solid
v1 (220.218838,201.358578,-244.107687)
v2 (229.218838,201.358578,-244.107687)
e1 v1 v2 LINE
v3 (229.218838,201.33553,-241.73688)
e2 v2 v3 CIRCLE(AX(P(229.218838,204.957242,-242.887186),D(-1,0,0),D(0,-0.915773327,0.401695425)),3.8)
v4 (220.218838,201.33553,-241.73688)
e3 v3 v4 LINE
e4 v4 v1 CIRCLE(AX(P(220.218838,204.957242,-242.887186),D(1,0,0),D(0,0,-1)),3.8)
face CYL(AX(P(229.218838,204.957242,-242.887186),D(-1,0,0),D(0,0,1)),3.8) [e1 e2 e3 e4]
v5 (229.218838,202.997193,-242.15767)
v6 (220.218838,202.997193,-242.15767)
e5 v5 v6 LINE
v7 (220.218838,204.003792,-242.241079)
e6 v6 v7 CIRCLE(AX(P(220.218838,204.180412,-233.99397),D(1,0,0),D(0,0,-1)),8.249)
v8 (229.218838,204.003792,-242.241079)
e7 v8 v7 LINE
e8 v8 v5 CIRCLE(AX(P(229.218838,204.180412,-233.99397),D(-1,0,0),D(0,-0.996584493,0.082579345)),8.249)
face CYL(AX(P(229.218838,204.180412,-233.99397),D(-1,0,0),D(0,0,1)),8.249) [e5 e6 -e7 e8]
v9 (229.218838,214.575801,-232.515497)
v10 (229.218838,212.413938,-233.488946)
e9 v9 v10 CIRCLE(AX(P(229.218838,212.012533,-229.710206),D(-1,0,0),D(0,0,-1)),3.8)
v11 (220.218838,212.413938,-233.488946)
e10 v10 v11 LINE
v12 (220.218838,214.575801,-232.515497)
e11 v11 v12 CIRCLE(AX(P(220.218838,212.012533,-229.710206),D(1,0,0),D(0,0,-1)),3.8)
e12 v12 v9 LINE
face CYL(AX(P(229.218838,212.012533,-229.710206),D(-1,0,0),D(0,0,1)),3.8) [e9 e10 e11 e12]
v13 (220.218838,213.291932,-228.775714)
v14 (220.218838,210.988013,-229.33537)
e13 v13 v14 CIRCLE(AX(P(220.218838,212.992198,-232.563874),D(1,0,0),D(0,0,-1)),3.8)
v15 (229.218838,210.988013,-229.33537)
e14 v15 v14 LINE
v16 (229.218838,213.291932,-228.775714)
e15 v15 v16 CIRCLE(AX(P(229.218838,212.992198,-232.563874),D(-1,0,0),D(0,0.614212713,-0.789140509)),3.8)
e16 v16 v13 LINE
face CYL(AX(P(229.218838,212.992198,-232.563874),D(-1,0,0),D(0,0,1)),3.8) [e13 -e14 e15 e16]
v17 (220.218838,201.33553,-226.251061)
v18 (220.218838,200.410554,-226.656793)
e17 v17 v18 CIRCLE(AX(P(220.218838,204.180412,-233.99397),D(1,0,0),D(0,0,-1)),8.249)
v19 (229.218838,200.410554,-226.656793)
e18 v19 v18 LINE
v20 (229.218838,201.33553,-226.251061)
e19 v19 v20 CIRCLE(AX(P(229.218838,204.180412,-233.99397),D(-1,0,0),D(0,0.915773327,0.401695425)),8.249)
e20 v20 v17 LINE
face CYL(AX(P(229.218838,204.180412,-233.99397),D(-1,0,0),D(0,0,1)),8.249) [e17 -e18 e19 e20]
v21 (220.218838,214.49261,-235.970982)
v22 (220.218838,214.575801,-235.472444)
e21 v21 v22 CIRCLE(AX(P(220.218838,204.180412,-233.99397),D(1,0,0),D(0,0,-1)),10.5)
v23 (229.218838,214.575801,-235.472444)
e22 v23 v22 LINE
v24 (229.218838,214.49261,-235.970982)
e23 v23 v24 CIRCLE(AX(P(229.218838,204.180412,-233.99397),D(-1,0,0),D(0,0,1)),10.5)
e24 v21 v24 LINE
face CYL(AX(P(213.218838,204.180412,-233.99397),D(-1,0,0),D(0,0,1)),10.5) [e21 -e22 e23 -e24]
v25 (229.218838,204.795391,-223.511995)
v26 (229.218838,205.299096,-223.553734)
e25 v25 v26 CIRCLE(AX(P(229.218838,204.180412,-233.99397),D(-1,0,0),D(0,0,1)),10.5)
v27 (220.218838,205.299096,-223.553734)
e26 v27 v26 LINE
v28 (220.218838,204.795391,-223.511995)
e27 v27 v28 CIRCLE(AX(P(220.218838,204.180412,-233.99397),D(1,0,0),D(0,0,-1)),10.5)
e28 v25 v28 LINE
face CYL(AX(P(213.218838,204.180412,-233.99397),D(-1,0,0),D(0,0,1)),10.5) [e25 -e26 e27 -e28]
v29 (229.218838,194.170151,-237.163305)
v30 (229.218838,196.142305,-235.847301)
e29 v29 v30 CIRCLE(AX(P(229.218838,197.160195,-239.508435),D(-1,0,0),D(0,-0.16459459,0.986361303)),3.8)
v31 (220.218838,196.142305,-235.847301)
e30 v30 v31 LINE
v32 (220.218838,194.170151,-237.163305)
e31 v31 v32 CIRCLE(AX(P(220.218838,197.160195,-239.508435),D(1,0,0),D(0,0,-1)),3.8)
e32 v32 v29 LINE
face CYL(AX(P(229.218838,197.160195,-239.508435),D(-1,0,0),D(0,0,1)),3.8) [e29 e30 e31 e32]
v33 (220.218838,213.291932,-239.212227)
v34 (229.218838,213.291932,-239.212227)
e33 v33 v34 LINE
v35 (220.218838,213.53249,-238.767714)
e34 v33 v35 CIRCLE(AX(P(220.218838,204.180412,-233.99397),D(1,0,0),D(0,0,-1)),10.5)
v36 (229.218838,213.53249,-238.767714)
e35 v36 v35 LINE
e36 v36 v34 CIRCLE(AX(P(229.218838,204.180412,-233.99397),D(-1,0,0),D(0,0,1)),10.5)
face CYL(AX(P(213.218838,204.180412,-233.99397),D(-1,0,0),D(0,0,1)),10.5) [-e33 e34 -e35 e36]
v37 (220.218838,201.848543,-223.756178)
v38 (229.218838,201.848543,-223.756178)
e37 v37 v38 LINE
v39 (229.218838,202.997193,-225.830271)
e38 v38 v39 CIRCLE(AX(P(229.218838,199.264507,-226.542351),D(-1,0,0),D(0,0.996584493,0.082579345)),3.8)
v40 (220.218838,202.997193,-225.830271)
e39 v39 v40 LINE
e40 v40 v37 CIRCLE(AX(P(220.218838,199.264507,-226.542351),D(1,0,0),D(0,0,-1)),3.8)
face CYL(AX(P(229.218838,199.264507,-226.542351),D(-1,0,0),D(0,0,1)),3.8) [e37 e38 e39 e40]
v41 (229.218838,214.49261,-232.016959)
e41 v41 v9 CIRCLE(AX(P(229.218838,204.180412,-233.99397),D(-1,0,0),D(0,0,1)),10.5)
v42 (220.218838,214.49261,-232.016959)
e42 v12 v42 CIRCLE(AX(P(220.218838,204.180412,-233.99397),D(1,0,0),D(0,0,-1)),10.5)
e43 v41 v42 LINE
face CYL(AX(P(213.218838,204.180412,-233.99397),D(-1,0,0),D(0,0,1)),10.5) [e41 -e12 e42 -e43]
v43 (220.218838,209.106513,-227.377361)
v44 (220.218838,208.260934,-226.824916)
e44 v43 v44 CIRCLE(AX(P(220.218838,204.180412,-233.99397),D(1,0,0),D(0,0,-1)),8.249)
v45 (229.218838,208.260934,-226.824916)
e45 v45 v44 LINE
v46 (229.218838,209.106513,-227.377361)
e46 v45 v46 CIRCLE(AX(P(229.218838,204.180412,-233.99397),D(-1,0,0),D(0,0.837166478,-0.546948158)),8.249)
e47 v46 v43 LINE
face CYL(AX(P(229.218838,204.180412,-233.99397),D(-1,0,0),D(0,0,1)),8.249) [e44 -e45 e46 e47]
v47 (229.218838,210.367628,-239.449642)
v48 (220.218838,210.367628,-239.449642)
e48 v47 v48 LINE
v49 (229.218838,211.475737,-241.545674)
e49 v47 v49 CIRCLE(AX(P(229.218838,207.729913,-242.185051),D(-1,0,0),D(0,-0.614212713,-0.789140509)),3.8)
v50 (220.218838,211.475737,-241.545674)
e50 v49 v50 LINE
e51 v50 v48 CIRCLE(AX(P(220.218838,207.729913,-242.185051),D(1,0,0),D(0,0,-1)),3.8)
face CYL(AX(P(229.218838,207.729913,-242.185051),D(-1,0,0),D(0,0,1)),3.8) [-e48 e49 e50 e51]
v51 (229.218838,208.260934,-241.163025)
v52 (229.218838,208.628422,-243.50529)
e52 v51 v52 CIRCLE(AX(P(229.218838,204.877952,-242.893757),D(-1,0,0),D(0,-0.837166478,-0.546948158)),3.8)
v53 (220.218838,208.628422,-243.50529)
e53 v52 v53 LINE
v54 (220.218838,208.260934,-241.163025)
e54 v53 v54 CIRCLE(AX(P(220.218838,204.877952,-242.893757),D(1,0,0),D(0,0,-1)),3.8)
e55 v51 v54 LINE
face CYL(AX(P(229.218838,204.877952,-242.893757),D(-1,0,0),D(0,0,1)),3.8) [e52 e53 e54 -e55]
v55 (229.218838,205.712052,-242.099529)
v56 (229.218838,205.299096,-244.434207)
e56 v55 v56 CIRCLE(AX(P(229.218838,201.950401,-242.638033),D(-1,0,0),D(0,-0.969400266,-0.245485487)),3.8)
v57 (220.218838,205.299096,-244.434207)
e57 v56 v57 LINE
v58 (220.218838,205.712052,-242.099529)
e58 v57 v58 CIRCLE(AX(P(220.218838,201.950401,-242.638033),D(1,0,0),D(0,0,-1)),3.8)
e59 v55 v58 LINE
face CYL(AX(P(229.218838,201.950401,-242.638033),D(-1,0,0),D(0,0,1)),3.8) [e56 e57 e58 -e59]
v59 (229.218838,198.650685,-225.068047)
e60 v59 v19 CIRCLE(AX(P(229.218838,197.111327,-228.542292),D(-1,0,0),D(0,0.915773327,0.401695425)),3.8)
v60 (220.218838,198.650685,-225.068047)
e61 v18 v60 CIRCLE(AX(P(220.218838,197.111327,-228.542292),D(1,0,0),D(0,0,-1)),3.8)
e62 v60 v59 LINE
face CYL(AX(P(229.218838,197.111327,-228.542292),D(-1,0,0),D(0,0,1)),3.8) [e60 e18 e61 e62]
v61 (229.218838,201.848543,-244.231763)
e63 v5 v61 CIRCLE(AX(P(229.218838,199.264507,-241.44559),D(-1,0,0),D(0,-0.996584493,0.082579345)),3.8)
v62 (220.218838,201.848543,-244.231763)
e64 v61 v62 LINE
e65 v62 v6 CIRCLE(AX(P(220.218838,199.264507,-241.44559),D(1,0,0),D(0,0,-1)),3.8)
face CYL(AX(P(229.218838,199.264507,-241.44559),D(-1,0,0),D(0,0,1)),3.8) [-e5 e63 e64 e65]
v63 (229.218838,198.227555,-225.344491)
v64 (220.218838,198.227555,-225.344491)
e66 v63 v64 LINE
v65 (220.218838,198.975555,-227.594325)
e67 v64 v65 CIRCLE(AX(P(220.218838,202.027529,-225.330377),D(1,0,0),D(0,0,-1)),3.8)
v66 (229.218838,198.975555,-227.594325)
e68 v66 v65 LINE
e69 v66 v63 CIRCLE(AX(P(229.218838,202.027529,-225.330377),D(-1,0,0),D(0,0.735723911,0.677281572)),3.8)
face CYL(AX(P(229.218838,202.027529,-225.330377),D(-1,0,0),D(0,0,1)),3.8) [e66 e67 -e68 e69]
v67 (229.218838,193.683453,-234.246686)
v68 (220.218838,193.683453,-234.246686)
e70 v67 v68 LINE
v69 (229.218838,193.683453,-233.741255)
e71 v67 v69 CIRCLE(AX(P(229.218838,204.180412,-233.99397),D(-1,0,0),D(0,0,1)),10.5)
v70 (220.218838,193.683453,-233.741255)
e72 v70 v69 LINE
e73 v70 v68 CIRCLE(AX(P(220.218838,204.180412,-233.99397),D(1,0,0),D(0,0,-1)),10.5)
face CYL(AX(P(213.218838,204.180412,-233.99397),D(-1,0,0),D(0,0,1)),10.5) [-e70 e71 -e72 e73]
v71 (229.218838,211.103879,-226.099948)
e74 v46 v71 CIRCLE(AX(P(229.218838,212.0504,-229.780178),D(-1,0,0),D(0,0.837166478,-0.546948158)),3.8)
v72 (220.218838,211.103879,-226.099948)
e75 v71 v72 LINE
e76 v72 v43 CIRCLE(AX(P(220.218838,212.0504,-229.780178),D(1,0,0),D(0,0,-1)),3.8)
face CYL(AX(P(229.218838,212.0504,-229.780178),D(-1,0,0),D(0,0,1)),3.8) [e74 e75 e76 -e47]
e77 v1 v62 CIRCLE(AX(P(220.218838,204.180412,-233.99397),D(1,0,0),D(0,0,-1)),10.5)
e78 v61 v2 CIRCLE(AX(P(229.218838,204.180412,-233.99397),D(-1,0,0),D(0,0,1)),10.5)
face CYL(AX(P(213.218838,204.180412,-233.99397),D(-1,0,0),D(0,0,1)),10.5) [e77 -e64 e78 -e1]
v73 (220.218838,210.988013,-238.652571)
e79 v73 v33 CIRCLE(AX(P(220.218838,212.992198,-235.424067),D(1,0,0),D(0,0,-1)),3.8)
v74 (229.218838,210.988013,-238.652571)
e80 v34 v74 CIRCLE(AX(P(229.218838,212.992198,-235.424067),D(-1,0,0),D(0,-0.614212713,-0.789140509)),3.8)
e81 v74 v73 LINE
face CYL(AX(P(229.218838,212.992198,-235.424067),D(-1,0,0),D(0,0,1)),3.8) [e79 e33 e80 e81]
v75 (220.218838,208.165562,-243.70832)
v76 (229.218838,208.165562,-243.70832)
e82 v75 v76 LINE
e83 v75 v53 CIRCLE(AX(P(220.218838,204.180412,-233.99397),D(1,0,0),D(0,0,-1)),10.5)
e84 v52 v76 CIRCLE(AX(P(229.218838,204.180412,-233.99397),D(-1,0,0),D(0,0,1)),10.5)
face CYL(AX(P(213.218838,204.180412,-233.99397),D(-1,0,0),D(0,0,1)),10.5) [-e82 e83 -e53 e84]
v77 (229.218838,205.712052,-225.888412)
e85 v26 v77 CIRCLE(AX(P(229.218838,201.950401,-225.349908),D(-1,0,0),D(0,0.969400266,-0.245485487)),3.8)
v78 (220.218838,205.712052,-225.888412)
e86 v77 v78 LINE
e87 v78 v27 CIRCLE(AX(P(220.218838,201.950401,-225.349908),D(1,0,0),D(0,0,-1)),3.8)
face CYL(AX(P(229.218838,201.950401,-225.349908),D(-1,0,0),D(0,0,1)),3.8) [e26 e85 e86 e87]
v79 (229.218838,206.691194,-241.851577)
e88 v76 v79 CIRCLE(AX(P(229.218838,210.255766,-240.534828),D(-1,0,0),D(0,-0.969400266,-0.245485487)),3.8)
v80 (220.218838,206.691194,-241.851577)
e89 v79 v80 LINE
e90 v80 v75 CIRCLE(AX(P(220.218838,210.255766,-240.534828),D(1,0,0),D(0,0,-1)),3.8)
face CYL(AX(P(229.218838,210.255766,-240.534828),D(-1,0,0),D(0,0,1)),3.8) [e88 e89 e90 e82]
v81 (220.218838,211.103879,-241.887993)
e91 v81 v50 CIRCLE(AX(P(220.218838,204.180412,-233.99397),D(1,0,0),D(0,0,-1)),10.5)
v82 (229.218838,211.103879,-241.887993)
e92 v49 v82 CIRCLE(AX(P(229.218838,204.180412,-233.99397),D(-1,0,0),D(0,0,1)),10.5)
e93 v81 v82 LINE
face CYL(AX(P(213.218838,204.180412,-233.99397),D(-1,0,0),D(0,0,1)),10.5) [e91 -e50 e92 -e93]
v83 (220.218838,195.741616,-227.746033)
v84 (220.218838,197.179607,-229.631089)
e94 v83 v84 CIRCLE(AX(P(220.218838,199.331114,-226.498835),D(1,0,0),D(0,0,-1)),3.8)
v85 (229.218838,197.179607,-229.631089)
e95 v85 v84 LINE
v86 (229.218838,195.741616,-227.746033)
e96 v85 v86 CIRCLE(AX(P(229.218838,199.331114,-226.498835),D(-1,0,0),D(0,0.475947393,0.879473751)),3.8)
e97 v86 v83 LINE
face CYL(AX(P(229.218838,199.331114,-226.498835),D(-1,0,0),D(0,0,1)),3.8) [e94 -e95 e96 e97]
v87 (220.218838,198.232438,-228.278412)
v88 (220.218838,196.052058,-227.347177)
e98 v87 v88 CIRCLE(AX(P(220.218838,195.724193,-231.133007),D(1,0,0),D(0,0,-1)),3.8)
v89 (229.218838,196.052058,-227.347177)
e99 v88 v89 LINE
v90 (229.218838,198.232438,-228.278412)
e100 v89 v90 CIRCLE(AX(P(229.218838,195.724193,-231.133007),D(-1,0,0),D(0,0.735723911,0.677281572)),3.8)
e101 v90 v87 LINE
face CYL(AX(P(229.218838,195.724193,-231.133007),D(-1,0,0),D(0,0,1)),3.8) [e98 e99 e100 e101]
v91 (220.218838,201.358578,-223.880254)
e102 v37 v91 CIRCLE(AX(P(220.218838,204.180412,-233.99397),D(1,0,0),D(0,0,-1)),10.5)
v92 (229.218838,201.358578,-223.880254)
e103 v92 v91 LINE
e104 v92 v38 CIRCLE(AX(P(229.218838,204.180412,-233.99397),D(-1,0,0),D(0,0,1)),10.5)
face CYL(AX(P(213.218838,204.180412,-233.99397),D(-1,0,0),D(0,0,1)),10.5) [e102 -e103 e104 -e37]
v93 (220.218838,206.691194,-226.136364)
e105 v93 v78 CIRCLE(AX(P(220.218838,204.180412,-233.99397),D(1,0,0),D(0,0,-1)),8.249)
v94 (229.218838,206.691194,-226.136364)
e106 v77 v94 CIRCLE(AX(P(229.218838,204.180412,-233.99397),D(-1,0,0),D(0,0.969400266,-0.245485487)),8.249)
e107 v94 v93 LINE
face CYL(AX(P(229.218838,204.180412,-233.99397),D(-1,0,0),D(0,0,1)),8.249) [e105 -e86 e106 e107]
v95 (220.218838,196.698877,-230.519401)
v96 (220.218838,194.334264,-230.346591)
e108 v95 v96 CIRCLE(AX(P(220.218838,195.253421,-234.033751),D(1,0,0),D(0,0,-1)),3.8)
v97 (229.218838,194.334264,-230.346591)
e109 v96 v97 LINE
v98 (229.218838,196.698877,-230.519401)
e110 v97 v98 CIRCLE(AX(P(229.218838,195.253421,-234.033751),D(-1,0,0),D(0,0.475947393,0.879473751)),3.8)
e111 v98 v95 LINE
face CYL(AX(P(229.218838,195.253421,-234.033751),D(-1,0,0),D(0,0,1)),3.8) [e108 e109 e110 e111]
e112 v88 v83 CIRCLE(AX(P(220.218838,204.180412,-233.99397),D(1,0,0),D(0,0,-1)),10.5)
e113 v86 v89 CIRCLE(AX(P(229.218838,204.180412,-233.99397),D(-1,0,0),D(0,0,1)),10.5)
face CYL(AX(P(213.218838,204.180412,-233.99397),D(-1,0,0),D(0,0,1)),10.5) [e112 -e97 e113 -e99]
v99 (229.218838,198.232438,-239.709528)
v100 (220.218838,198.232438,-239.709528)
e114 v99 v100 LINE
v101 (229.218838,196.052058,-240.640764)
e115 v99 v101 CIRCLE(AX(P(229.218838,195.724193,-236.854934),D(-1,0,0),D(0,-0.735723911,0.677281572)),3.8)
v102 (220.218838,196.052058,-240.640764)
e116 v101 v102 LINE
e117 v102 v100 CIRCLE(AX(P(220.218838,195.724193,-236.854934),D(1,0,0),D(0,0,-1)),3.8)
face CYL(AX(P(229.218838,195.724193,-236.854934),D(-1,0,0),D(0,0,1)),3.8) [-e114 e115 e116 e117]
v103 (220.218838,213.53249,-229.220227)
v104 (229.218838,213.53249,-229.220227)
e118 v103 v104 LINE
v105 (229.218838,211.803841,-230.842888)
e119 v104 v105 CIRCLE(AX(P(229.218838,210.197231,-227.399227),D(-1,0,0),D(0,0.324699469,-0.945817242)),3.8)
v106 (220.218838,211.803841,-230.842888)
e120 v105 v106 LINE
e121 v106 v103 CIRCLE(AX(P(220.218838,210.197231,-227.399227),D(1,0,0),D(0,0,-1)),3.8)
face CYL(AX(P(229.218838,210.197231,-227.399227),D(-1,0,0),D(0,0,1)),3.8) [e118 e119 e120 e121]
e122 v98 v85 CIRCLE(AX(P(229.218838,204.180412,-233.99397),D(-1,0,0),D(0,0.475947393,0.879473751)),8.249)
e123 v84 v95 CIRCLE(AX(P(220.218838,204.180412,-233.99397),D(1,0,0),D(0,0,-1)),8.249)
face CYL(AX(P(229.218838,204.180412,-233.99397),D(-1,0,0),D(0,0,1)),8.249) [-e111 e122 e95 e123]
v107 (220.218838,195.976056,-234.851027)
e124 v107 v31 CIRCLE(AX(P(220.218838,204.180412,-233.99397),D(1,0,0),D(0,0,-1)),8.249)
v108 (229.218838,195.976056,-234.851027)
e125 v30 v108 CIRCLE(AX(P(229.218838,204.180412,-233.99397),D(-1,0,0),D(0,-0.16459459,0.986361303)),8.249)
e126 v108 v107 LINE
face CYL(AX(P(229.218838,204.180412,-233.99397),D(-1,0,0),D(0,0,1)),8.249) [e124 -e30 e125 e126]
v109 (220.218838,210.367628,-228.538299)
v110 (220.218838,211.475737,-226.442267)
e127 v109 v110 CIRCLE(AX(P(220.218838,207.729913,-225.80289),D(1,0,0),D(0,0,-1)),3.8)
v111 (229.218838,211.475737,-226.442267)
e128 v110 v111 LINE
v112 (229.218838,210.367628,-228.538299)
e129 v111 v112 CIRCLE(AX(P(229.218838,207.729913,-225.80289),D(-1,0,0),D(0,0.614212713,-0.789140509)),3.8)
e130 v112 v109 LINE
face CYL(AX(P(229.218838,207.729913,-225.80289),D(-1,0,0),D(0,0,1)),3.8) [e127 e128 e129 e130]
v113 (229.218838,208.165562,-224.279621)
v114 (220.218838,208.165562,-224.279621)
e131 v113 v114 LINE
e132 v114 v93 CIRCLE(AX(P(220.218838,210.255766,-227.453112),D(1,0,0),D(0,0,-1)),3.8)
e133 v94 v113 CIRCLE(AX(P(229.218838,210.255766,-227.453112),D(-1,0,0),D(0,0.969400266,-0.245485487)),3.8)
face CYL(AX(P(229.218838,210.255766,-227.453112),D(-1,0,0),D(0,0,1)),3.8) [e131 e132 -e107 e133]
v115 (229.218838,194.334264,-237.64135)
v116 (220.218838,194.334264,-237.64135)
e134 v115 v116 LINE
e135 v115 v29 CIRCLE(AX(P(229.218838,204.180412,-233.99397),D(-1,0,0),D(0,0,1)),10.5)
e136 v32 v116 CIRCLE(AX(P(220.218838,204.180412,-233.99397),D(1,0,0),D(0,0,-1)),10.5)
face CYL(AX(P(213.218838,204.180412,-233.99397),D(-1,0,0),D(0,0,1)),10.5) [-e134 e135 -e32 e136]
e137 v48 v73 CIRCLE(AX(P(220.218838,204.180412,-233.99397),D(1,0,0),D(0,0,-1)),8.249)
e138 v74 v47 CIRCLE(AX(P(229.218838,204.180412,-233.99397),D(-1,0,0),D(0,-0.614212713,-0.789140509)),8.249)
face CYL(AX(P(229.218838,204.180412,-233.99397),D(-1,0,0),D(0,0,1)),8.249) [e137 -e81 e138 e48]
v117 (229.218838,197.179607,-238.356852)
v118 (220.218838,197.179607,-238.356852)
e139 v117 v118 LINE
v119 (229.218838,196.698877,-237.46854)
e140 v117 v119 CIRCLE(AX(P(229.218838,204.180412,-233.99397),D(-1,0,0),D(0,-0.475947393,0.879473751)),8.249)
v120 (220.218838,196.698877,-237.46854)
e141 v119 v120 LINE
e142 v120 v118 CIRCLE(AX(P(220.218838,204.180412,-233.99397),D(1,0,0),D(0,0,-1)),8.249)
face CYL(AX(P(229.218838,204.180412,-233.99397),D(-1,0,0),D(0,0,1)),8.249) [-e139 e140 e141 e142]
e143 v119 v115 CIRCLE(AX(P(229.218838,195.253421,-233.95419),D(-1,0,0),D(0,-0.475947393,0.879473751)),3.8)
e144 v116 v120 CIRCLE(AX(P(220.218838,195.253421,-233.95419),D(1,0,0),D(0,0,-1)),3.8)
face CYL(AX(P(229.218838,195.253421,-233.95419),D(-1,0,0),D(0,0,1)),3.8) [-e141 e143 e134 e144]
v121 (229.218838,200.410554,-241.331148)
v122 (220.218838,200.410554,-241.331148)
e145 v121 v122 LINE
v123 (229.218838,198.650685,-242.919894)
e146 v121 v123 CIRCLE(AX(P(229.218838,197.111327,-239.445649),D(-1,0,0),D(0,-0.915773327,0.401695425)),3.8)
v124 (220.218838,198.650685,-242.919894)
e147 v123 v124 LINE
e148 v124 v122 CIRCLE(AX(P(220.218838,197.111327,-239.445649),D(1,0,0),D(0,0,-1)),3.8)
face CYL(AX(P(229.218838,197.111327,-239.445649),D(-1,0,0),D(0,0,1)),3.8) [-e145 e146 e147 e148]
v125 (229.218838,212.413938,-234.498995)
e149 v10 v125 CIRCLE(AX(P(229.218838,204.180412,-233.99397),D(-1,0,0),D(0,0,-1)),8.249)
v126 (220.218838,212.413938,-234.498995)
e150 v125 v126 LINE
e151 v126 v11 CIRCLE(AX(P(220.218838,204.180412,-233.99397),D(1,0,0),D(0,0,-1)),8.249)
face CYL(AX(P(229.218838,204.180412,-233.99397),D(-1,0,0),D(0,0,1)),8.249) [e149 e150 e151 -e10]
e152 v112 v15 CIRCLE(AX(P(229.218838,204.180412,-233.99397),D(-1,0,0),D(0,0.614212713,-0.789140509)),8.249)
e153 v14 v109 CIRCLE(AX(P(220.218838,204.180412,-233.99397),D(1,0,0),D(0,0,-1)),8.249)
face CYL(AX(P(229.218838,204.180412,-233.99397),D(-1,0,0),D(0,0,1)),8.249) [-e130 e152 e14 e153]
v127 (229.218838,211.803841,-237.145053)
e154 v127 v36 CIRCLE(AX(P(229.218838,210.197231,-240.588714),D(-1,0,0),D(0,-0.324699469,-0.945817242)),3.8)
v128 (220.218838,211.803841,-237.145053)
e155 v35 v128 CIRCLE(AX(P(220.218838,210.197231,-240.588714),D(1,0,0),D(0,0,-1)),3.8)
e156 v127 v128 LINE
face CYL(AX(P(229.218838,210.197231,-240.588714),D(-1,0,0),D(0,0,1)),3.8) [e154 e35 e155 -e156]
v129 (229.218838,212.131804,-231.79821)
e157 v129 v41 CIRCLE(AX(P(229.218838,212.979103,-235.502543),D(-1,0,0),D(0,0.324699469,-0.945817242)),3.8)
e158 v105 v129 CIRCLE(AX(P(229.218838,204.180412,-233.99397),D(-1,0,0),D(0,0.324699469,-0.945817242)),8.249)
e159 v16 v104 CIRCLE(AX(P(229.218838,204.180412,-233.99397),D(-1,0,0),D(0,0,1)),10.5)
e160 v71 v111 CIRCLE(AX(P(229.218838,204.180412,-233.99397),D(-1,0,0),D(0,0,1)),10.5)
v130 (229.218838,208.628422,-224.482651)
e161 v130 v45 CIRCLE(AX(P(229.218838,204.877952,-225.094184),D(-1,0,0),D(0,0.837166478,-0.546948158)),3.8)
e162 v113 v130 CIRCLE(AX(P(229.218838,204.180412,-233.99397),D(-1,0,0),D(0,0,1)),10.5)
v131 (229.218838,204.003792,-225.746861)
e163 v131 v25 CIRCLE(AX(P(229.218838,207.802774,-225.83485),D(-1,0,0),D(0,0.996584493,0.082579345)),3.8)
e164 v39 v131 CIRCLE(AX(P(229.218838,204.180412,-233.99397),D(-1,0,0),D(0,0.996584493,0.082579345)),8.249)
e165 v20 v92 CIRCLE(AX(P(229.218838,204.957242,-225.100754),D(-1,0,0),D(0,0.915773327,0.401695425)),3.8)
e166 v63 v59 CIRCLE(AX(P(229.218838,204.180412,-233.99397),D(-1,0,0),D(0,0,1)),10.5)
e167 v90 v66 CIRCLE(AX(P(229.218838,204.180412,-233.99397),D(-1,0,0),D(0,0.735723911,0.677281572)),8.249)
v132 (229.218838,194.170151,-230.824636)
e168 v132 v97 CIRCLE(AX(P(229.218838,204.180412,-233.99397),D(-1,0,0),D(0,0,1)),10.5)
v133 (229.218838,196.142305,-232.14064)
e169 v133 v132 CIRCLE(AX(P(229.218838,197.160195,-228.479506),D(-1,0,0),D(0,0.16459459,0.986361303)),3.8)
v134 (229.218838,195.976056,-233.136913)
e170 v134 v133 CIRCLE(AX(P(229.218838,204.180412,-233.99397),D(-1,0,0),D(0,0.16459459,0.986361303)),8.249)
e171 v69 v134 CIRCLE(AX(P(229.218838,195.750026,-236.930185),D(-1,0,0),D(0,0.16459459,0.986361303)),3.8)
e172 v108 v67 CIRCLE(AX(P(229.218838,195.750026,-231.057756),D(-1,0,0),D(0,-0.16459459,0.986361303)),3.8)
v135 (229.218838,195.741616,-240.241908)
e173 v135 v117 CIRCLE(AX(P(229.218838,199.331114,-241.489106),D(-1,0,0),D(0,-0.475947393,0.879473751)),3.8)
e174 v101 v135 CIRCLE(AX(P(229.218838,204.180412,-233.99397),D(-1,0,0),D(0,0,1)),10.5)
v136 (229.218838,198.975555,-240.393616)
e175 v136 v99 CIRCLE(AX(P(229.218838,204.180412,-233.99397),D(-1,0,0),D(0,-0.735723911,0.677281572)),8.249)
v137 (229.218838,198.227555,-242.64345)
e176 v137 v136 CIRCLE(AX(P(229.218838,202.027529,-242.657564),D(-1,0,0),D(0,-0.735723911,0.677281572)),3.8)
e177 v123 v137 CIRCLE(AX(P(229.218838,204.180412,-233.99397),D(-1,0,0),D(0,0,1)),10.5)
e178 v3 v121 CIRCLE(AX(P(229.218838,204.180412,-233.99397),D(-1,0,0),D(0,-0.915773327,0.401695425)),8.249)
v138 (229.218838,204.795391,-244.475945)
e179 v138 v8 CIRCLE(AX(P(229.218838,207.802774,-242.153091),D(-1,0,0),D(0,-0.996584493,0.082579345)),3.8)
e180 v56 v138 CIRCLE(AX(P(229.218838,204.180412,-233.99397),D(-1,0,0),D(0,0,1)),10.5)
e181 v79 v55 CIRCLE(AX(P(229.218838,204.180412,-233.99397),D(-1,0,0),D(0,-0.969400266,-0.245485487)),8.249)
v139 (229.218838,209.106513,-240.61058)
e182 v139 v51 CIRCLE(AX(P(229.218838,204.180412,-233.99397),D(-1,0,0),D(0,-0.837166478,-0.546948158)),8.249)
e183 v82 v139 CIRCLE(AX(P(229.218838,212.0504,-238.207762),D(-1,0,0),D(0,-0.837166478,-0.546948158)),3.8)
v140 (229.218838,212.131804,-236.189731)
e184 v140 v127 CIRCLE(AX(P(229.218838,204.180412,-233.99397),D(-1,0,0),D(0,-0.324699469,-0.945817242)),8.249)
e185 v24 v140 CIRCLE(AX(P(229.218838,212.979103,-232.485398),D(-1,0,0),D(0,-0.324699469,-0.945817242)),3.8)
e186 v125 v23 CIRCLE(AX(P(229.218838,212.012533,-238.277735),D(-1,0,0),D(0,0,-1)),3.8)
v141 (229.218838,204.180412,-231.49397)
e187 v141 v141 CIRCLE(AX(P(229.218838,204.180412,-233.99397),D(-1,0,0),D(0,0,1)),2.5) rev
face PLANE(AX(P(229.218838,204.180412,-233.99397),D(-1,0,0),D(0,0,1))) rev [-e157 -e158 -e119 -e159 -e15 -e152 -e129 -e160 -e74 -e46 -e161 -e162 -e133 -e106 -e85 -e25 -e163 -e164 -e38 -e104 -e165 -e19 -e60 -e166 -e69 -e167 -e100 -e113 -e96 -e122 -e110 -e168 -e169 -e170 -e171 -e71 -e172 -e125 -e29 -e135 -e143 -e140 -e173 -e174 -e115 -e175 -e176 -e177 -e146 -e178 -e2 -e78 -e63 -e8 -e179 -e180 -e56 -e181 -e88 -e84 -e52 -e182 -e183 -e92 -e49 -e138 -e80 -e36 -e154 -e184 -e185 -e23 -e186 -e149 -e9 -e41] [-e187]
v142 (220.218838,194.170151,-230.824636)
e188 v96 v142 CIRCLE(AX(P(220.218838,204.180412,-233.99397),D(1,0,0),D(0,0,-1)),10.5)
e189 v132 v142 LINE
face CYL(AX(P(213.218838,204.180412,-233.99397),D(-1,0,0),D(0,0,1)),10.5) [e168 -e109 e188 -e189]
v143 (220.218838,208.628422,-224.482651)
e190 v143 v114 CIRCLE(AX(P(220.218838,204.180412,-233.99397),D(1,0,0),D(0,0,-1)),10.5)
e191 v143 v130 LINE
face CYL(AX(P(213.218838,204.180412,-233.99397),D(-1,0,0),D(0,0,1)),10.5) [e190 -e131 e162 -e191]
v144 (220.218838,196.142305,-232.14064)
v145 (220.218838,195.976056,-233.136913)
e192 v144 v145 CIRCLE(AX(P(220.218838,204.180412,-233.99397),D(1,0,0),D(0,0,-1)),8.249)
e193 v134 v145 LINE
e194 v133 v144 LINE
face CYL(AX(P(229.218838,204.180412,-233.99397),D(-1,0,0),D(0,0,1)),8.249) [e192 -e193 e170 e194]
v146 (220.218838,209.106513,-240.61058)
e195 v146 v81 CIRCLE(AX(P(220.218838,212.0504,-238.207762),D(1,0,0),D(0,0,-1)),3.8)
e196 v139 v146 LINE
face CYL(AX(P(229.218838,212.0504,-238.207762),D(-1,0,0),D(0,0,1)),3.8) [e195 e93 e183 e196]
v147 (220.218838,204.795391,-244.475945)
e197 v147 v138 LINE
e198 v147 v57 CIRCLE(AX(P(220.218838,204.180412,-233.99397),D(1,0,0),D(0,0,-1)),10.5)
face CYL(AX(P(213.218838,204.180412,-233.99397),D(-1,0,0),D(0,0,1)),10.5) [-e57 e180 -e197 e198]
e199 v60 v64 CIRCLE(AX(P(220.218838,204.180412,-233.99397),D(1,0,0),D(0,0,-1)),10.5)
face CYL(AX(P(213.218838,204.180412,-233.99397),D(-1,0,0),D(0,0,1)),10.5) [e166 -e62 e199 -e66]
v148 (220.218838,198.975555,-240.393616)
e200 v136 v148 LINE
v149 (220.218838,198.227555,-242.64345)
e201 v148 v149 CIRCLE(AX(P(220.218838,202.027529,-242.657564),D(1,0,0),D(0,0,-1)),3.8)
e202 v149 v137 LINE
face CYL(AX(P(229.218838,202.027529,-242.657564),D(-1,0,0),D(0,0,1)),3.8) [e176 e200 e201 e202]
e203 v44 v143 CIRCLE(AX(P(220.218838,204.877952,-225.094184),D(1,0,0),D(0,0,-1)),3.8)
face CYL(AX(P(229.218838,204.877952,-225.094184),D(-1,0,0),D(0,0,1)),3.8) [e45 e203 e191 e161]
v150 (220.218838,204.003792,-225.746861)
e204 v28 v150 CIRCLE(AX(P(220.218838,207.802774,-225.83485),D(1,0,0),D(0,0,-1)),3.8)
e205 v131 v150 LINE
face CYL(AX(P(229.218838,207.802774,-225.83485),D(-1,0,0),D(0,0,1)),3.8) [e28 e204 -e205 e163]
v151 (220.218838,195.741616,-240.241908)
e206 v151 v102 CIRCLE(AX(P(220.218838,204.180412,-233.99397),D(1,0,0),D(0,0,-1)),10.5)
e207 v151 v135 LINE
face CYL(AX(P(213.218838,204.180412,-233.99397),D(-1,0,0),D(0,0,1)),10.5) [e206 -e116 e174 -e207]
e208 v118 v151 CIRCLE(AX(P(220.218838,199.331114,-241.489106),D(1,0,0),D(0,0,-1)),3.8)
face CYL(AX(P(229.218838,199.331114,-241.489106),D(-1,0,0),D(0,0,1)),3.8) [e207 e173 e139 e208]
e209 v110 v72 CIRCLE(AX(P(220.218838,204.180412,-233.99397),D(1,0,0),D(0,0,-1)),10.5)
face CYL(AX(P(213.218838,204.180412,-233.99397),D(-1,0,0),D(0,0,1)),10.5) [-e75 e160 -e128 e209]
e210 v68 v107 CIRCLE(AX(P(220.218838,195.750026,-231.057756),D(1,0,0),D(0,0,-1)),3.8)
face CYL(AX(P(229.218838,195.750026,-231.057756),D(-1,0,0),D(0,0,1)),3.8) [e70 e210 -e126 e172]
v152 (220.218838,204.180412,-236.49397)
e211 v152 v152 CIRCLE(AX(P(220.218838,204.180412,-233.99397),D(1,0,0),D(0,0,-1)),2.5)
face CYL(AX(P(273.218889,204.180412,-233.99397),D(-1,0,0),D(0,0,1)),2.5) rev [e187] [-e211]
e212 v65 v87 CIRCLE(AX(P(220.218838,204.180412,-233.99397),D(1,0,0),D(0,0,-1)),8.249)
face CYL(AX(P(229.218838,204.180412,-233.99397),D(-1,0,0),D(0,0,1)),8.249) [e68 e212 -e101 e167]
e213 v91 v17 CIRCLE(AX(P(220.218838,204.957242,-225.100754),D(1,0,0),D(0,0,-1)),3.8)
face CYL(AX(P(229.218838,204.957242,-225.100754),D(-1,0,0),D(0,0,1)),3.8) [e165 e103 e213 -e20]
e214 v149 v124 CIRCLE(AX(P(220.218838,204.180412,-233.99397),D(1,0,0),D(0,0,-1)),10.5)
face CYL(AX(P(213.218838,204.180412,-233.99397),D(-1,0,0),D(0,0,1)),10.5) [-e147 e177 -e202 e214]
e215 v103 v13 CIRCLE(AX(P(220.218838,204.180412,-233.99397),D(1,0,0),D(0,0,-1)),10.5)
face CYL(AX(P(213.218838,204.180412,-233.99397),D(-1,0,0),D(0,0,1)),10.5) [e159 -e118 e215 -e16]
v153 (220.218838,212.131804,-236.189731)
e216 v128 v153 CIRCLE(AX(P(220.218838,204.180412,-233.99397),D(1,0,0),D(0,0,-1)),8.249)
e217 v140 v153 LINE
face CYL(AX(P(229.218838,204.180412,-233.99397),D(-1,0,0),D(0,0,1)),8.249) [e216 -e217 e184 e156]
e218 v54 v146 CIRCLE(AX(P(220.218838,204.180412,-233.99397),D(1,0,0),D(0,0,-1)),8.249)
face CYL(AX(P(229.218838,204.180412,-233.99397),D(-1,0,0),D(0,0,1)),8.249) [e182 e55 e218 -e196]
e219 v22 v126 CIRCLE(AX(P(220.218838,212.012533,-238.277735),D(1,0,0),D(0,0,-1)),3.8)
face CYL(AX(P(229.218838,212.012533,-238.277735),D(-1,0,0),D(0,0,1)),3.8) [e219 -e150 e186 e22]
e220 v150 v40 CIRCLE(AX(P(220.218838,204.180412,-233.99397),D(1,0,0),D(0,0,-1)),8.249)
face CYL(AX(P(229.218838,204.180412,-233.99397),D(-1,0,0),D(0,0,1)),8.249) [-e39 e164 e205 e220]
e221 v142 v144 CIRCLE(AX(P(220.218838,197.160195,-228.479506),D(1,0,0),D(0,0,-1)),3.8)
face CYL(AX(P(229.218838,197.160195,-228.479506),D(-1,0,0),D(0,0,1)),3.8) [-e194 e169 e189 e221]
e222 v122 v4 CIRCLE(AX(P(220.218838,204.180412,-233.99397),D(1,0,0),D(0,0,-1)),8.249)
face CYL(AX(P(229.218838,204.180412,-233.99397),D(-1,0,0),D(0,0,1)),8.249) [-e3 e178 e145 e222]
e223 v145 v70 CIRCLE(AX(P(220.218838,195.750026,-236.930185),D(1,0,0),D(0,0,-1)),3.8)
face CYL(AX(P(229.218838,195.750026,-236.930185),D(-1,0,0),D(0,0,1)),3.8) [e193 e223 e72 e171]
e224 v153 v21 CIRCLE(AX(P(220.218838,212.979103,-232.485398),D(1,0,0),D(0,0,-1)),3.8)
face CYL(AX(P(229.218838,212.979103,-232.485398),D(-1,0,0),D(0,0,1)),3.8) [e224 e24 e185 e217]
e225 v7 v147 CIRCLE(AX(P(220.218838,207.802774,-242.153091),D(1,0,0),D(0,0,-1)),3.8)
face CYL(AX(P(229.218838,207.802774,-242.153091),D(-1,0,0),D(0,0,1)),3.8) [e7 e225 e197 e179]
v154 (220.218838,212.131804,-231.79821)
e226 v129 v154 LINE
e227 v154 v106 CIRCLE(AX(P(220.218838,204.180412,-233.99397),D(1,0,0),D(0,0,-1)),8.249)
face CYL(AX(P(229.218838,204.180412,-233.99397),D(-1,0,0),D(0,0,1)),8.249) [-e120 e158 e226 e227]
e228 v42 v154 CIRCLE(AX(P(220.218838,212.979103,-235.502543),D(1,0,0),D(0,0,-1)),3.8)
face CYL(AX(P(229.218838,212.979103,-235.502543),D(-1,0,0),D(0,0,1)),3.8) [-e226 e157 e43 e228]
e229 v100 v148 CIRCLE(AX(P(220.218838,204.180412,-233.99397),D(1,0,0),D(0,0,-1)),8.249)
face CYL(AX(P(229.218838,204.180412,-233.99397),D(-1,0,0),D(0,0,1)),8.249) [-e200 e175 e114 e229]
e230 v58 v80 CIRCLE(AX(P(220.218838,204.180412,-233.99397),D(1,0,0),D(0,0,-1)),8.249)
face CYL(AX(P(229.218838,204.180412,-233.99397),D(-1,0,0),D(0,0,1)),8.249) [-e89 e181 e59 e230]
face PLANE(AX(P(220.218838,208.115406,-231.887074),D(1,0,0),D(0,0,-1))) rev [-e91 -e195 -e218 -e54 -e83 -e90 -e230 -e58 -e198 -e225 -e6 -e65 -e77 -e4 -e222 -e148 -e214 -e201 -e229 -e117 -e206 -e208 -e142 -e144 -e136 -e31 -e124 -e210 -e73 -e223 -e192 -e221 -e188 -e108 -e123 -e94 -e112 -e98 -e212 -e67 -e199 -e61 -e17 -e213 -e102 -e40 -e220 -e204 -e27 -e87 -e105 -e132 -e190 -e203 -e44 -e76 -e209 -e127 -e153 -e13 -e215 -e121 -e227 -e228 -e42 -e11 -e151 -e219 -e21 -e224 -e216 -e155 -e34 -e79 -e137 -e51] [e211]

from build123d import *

# Parameters (mm, degrees)
SPUR_START             = 223.218838191
SPUR_GEAR_AM_OUTLINE_R = 2.5
SPUR_GEAR_AM_DEPTH     = 6
BOSS_EXTRUDE2_START    = -3
SKETCH4_R              = 2.5
BOSS_EXTRUDE2_DEPTH    = 3


# Read off the part's stored shape, not the designer's step: spur gear_am
with BuildPart() as part:
    # spur gear_am outline → spur gear_am (new body)
    with BuildSketch(Plane.YZ.offset(SPUR_START)):
        with BuildLine():
            ThreePointArc((211.475737045, -226.442266721), (211.291868278, -226.268869388), (211.103879422, -226.099947664))
            ThreePointArc((211.103879422, -226.099947664), (210.003020465, -226.578891651), (209.10651348, -227.377360819))
            ThreePointArc((209.10651348, -227.377360819), (208.692187132, -227.088184171), (208.260933872, -226.82491609))
            ThreePointArc((208.260933872, -226.82491609), (208.632027885, -225.683177494), (208.628422007, -224.482650616))
            ThreePointArc((208.628422007, -224.482650616), (208.398213735, -224.37835052), (208.16556184, -224.279621323))
            ThreePointArc((208.16556184, -224.279621323), (207.279863315, -225.090063122), (206.691194067, -226.136364371))
            ThreePointArc((206.691194067, -226.136364371), (206.20542156, -225.997387656), (205.712051785, -225.888411871))
            ThreePointArc((205.712051785, -225.888411871), (205.692316984, -224.688041793), (205.299096042, -223.553733599))
            ThreePointArc((205.299096042, -223.553733599), (205.047494903, -223.529833273), (204.795391412, -223.511995443))
            ThreePointArc((204.795391412, -223.511995443), (204.220832498, -224.566111111), (204.003792434, -225.746861465))
            ThreePointArc((204.003792434, -225.746861465), (203.499214755, -225.773144967), (202.997192736, -225.830270694))
            ThreePointArc((202.997192736, -225.830270694), (202.588767694, -224.701347857), (201.848543279, -223.756178241))
            ThreePointArc((201.848543279, -223.756178241), (201.602814161, -223.815267658), (201.358578398, -223.8802542))
            ThreePointArc((201.358578398, -223.8802542), (201.157421469, -225.063813948), (201.335530247, -226.251060784))
            ThreePointArc((201.335530247, -226.251060784), (200.866826218, -226.439756278), (200.41055383, -226.656793059))
            ThreePointArc((200.41055383, -226.656793059), (199.657697737, -225.721653769), (198.65068465, -225.068046525))
            ThreePointArc((198.65068465, -225.068046525), (198.437456116, -225.203722428), (198.227554816, -225.344491043))
            ThreePointArc((198.227554816, -225.344491043), (198.421598346, -226.529237808), (198.975555117, -227.59432451))
            ThreePointArc((198.975555117, -227.59432451), (198.593516092, -227.924983911), (198.232437527, -228.278412442))
            ThreePointArc((198.232437527, -228.278412442), (197.216734024, -227.638393552), (196.052057758, -227.347177166))
            ThreePointArc((196.052057758, -227.347177166), (195.894436427, -227.544736967), (195.741615653, -227.74603319))
            ThreePointArc((195.741615653, -227.74603319), (196.309832015, -228.803581275), (197.179606967, -229.631089173))
            ThreePointArc((197.179606967, -229.631089173), (196.925632802, -230.067880405), (196.698876527, -230.519401222))
            ThreePointArc((196.698876527, -230.519401222), (195.530392847, -230.243858709), (194.334264148, -230.346590995))
            ThreePointArc((194.334264148, -230.346590995), (194.249330738, -230.584626023), (194.170150992, -230.824636287))
            ThreePointArc((194.170150992, -230.824636287), (195.050965127, -231.640383948), (196.142304648, -232.14063972))
            ThreePointArc((196.142304648, -232.14063972), (196.043917384, -232.636229675), (195.976055959, -233.136913491))
            ThreePointArc((195.976055959, -233.136913491), (194.78141544, -233.255706662), (193.683453412, -233.741254983))
            ThreePointArc((193.683453412, -233.741254983), (193.680411776, -233.99397045), (193.683453412, -234.246685917))
            ThreePointArc((193.683453412, -234.246685917), (194.78141544, -234.732234238), (195.976055959, -234.851027409))
            ThreePointArc((195.976055959, -234.851027409), (196.043917384, -235.351711225), (196.142304648, -235.84730118))
            ThreePointArc((196.142304648, -235.84730118), (195.050965127, -236.347556952), (194.170150992, -237.163304613))
            ThreePointArc((194.170150992, -237.163304613), (194.249330738, -237.403314877), (194.334264148, -237.641349905))
            ThreePointArc((194.334264148, -237.641349905), (195.530392847, -237.744082191), (196.698876527, -237.468539678))
            ThreePointArc((196.698876527, -237.468539678), (196.925632802, -237.920060495), (197.179606967, -238.356851727))
            ThreePointArc((197.179606967, -238.356851727), (196.309832016, -239.184359624), (195.741615653, -240.241907709))
            ThreePointArc((195.741615653, -240.241907709), (195.894436427, -240.443203933), (196.052057758, -240.640763734))
            ThreePointArc((196.052057758, -240.640763734), (197.216734024, -240.349547348), (198.232437527, -239.709528458))
            ThreePointArc((198.232437527, -239.709528458), (198.593516092, -240.062956989), (198.975555117, -240.39361639))
            ThreePointArc((198.975555117, -240.39361639), (198.421598346, -241.458703092), (198.227554816, -242.643449857))
            ThreePointArc((198.227554816, -242.643449857), (198.437456116, -242.784218472), (198.65068465, -242.919894375))
            ThreePointArc((198.65068465, -242.919894375), (199.657697737, -242.266287131), (200.41055383, -241.331147841))
            ThreePointArc((200.41055383, -241.331147841), (200.866826218, -241.548184622), (201.335530247, -241.736880115))
            ThreePointArc((201.335530247, -241.736880115), (201.157421469, -242.924126952), (201.358578398, -244.1076867))
            ThreePointArc((201.358578398, -244.1076867), (201.602814161, -244.172673242), (201.848543279, -244.231762659))
            ThreePointArc((201.848543279, -244.231762659), (202.588767694, -243.286593043), (202.997192736, -242.157670206))
            ThreePointArc((202.997192736, -242.157670206), (203.499214755, -242.214795933), (204.003792434, -242.241079435))
            ThreePointArc((204.003792434, -242.241079435), (204.220832498, -243.421829789), (204.795391412, -244.475945457))
            ThreePointArc((204.795391412, -244.475945457), (205.047494903, -244.458107627), (205.299096042, -244.434207301))
            ThreePointArc((205.299096042, -244.434207301), (205.692316984, -243.299899107), (205.712051785, -242.099529029))
            ThreePointArc((205.712051785, -242.099529029), (206.20542156, -241.990553244), (206.691194067, -241.851576529))
            ThreePointArc((206.691194067, -241.851576529), (207.279863315, -242.897877778), (208.16556184, -243.708319577))
            ThreePointArc((208.16556184, -243.708319577), (208.398213735, -243.60959038), (208.628422007, -243.505290284))
            ThreePointArc((208.628422007, -243.505290284), (208.632027885, -242.304763406), (208.260933872, -241.16302481))
            ThreePointArc((208.260933872, -241.16302481), (208.692187132, -240.899756729), (209.10651348, -240.61058008))
            ThreePointArc((209.10651348, -240.61058008), (210.003020465, -241.409049249), (211.103879422, -241.887993236))
            ThreePointArc((211.103879422, -241.887993236), (211.291868278, -241.719071512), (211.475737045, -241.545674179))
            ThreePointArc((211.475737045, -241.545674179), (211.089337107, -240.409024332), (210.367628075, -239.449642312))
            ThreePointArc((210.367628075, -239.449642312), (210.690031838, -239.060611117), (210.988013337, -238.652571312))
            ThreePointArc((210.988013337, -238.652571312), (212.095207616, -239.116681876), (213.291931857, -239.212227038))
            ThreePointArc((213.291931857, -239.212227038), (213.414886164, -238.991418077), (213.532490392, -238.767713799))
            ThreePointArc((213.532490392, -238.767713799), (212.797957066, -237.81811463), (211.803841388, -237.145053113))
            ThreePointArc((211.803841388, -237.145053113), (211.982458203, -236.672416371), (212.131803934, -236.189730854))
            ThreePointArc((212.131803934, -236.189730854), (213.329703827, -236.269189233), (214.492609711, -235.970981768))
            ThreePointArc((214.492609711, -235.970981768), (214.537205462, -235.722213648), (214.575800908, -235.472444254))
            ThreePointArc((214.575800908, -235.472444254), (213.572732278, -234.812799569), (212.413937812, -234.498995215))
            ThreePointArc((212.413937812, -234.498995215), (212.429411776, -233.99397045), (212.413937812, -233.488945685))
            ThreePointArc((212.413937812, -233.488945685), (213.572732278, -233.175141331), (214.575800908, -232.515496646))
            ThreePointArc((214.575800908, -232.515496646), (214.537205462, -232.265727252), (214.492609711, -232.016959132))
            ThreePointArc((214.492609711, -232.016959132), (213.329703827, -231.718751667), (212.131803934, -231.798210046))
            ThreePointArc((212.131803934, -231.798210046), (211.982458203, -231.315524528), (211.803841388, -230.842887786))
            ThreePointArc((211.803841388, -230.842887786), (212.797957066, -230.16982627), (213.532490392, -229.220227101))
            ThreePointArc((213.532490392, -229.220227101), (213.414886164, -228.996522823), (213.291931857, -228.775713862))
            ThreePointArc((213.291931857, -228.775713862), (212.095207616, -228.871259024), (210.988013337, -229.335369588))
            ThreePointArc((210.988013337, -229.335369588), (210.690031838, -228.927329783), (210.367628075, -228.538298588))
            ThreePointArc((210.367628075, -228.538298588), (211.089337107, -227.578916568), (211.475737045, -226.442266721))
        make_face()
        with Locations((204.180411776, -233.99397045)):
            Circle(SPUR_GEAR_AM_OUTLINE_R, mode=Mode.SUBTRACT)
    extrude(amount=SPUR_GEAR_AM_DEPTH)

    # Sketch4 → Boss-Extrude2 (add)
    with BuildSketch(Plane(origin=(223.218838191, 204.180411776, -233.99397045), x_dir=(0, 0, -1), z_dir=(1, 0, 0)).offset(BOSS_EXTRUDE2_START)):
        with BuildLine():
            ThreePointArc((-7.894022786, 6.923467646), (-7.415078799, 5.822608689), (-6.61660963, 4.926101704))
            ThreePointArc((-6.61660963, 4.926101704), (-6.905786279, 4.511775356), (-7.16905436, 4.080522097))
            ThreePointArc((-7.16905436, 4.080522097), (-8.310792956, 4.45161611), (-9.511319834, 4.448010231))
            ThreePointArc((-9.511319834, 4.448010231), (-9.61561993, 4.217801959), (-9.714349127, 3.985150064))
            ThreePointArc((-9.714349127, 3.985150064), (-8.903907328, 3.099451539), (-7.857606079, 2.510782291))
            ThreePointArc((-7.857606079, 2.510782291), (-7.996582794, 2.025009783), (-8.105558579, 1.531640009))
            ThreePointArc((-8.105558579, 1.531640009), (-9.305928658, 1.511905208), (-10.440236851, 1.118684266))
            ThreePointArc((-10.440236851, 1.118684266), (-10.464137177, 0.867083127), (-10.481975007, 0.614979636))
            ThreePointArc((-10.481975007, 0.614979636), (-9.427859339, 0.040420723), (-8.247108985, -0.176619342))
            ThreePointArc((-8.247108985, -0.176619342), (-8.220825483, -0.681197021), (-8.163699756, -1.18321904))
            ThreePointArc((-8.163699756, -1.18321904), (-9.292622593, -1.591644082), (-10.237792209, -2.331868497))
            ThreePointArc((-10.237792209, -2.331868497), (-10.178702792, -2.577597615), (-10.11371625, -2.821833378))
            ThreePointArc((-10.11371625, -2.821833378), (-8.930156502, -3.022990307), (-7.742909665, -2.844881529))
            ThreePointArc((-7.742909665, -2.844881529), (-7.554214172, -3.313585558), (-7.337177391, -3.769857946))
            ThreePointArc((-7.337177391, -3.769857946), (-8.272316681, -4.522714039), (-8.925923925, -5.529727126))
            ThreePointArc((-8.925923925, -5.529727126), (-8.790248022, -5.74295566), (-8.649479407, -5.95285696))
            ThreePointArc((-8.649479407, -5.95285696), (-7.464732643, -5.75881343), (-6.39964594, -5.204856659))
            ThreePointArc((-6.39964594, -5.204856659), (-6.068986539, -5.586895684), (-5.715558008, -5.947974249))
            ThreePointArc((-5.715558008, -5.947974249), (-6.355576898, -6.963677752), (-6.646793284, -8.128354018))
            ThreePointArc((-6.646793284, -8.128354018), (-6.449233483, -8.285975349), (-6.247937259, -8.438796123))
            ThreePointArc((-6.247937259, -8.438796123), (-5.190389174, -7.87057976), (-4.362881277, -7.000804808))
            ThreePointArc((-4.362881277, -7.000804808), (-3.926090045, -7.254778974), (-3.474569228, -7.481535249))
            ThreePointArc((-3.474569228, -7.481535249), (-3.750111741, -8.650018929), (-3.647379455, -9.846147628))
            ThreePointArc((-3.647379455, -9.846147628), (-3.409344427, -9.931081038), (-3.169334163, -10.010260784))
            ThreePointArc((-3.169334163, -10.010260784), (-2.353586502, -9.129446649), (-1.85333073, -8.038107128))
            ThreePointArc((-1.85333073, -8.038107128), (-1.357740775, -8.136494392), (-0.857056959, -8.204355817))
            ThreePointArc((-0.857056959, -8.204355817), (-0.738263788, -9.398996336), (-0.252715467, -10.496958364))
            ThreePointArc((-0.252715467, -10.496958364), (0, -10.5), (0.252715467, -10.496958364))
            ThreePointArc((0.252715467, -10.496958364), (0.738263788, -9.398996336), (0.857056959, -8.204355817))
            ThreePointArc((0.857056959, -8.204355817), (1.357740775, -8.136494392), (1.85333073, -8.038107128))
            ThreePointArc((1.85333073, -8.038107128), (2.353586502, -9.129446649), (3.169334163, -10.010260784))
            ThreePointArc((3.169334163, -10.010260784), (3.409344427, -9.931081038), (3.647379455, -9.846147628))
            ThreePointArc((3.647379455, -9.846147628), (3.750111741, -8.650018929), (3.474569228, -7.481535249))
            ThreePointArc((3.474569228, -7.481535249), (3.926090045, -7.254778974), (4.362881277, -7.000804808))
            ThreePointArc((4.362881277, -7.000804808), (5.190389174, -7.87057976), (6.247937259, -8.438796123))
            ThreePointArc((6.247937259, -8.438796123), (6.449233483, -8.285975349), (6.646793284, -8.128354018))
            ThreePointArc((6.646793284, -8.128354018), (6.355576898, -6.963677752), (5.715558008, -5.947974249))
            ThreePointArc((5.715558008, -5.947974249), (6.068986539, -5.586895684), (6.39964594, -5.204856659))
            ThreePointArc((6.39964594, -5.204856659), (7.464732643, -5.75881343), (8.649479407, -5.95285696))
            ThreePointArc((8.649479407, -5.95285696), (8.790248022, -5.74295566), (8.925923925, -5.529727126))
            ThreePointArc((8.925923925, -5.529727126), (8.272316681, -4.522714039), (7.337177391, -3.769857946))
            ThreePointArc((7.337177391, -3.769857946), (7.554214172, -3.313585558), (7.742909665, -2.844881529))
            ThreePointArc((7.742909665, -2.844881529), (8.930156502, -3.022990307), (10.11371625, -2.821833378))
            ThreePointArc((10.11371625, -2.821833378), (10.178702792, -2.577597615), (10.237792209, -2.331868497))
            ThreePointArc((10.237792209, -2.331868497), (9.292622593, -1.591644082), (8.163699756, -1.18321904))
            ThreePointArc((8.163699756, -1.18321904), (8.220825483, -0.681197021), (8.247108985, -0.176619342))
            ThreePointArc((8.247108985, -0.176619342), (9.427859339, 0.040420723), (10.481975007, 0.614979636))
            ThreePointArc((10.481975007, 0.614979636), (10.464137177, 0.867083127), (10.440236851, 1.118684266))
            ThreePointArc((10.440236851, 1.118684266), (9.305928658, 1.511905208), (8.105558579, 1.531640009))
            ThreePointArc((8.105558579, 1.531640009), (7.996582794, 2.025009783), (7.857606079, 2.510782291))
            ThreePointArc((7.857606079, 2.510782291), (8.903907328, 3.099451539), (9.714349127, 3.985150064))
            ThreePointArc((9.714349127, 3.985150064), (9.61561993, 4.217801959), (9.511319834, 4.448010231))
            ThreePointArc((9.511319834, 4.448010231), (8.310792956, 4.45161611), (7.16905436, 4.080522097))
            ThreePointArc((7.16905436, 4.080522097), (6.905786279, 4.511775356), (6.61660963, 4.926101704))
            ThreePointArc((6.61660963, 4.926101704), (7.415078799, 5.822608689), (7.894022786, 6.923467646))
            ThreePointArc((7.894022786, 6.923467646), (7.725101062, 7.111456502), (7.551703729, 7.295325269))
            ThreePointArc((7.551703729, 7.295325269), (6.415053882, 6.908925331), (5.455671862, 6.1872163))
            ThreePointArc((5.455671862, 6.1872163), (5.066640667, 6.509620062), (4.658600862, 6.807601561))
            ThreePointArc((4.658600862, 6.807601561), (5.122711426, 7.91479584), (5.218256588, 9.111520081))
            ThreePointArc((5.218256588, 9.111520081), (4.997447627, 9.234474388), (4.773743349, 9.352078616))
            ThreePointArc((4.773743349, 9.352078616), (3.82414418, 8.61754529), (3.151082664, 7.623429612))
            ThreePointArc((3.151082664, 7.623429612), (2.678445921, 7.802046427), (2.195760404, 7.951392158))
            ThreePointArc((2.195760404, 7.951392158), (2.275218783, 9.149292051), (1.977011318, 10.312197935))
            ThreePointArc((1.977011318, 10.312197935), (1.728243198, 10.356793686), (1.478473804, 10.395389132))
            ThreePointArc((1.478473804, 10.395389132), (0.818829119, 9.392320502), (0.505024765, 8.233526036))
            ThreePointArc((0.505024765, 8.233526036), (0, 8.249), (-0.505024765, 8.233526036))
            ThreePointArc((-0.505024765, 8.233526036), (-0.818829119, 9.392320502), (-1.478473804, 10.395389132))
            ThreePointArc((-1.478473804, 10.395389132), (-1.728243198, 10.356793686), (-1.977011318, 10.312197935))
            ThreePointArc((-1.977011318, 10.312197935), (-2.275218783, 9.149292051), (-2.195760404, 7.951392158))
            ThreePointArc((-2.195760404, 7.951392158), (-2.678445921, 7.802046427), (-3.151082664, 7.623429612))
            ThreePointArc((-3.151082664, 7.623429612), (-3.82414418, 8.61754529), (-4.773743349, 9.352078616))
            ThreePointArc((-4.773743349, 9.352078616), (-4.997447627, 9.234474388), (-5.218256588, 9.111520081))
            ThreePointArc((-5.218256588, 9.111520081), (-5.122711426, 7.91479584), (-4.658600862, 6.807601561))
            ThreePointArc((-4.658600862, 6.807601561), (-5.066640667, 6.509620062), (-5.455671862, 6.1872163))
            ThreePointArc((-5.455671862, 6.1872163), (-6.415053882, 6.908925331), (-7.551703729, 7.295325269))
            ThreePointArc((-7.551703729, 7.295325269), (-7.725101062, 7.111456502), (-7.894022786, 6.923467646))
        make_face()
        with Locations(Location((0, 0, 0), (0, 0, 180))):
            Circle(SKETCH4_R, mode=Mode.SUBTRACT)
    extrude(amount=BOSS_EXTRUDE2_DEPTH)


solid = part.part
